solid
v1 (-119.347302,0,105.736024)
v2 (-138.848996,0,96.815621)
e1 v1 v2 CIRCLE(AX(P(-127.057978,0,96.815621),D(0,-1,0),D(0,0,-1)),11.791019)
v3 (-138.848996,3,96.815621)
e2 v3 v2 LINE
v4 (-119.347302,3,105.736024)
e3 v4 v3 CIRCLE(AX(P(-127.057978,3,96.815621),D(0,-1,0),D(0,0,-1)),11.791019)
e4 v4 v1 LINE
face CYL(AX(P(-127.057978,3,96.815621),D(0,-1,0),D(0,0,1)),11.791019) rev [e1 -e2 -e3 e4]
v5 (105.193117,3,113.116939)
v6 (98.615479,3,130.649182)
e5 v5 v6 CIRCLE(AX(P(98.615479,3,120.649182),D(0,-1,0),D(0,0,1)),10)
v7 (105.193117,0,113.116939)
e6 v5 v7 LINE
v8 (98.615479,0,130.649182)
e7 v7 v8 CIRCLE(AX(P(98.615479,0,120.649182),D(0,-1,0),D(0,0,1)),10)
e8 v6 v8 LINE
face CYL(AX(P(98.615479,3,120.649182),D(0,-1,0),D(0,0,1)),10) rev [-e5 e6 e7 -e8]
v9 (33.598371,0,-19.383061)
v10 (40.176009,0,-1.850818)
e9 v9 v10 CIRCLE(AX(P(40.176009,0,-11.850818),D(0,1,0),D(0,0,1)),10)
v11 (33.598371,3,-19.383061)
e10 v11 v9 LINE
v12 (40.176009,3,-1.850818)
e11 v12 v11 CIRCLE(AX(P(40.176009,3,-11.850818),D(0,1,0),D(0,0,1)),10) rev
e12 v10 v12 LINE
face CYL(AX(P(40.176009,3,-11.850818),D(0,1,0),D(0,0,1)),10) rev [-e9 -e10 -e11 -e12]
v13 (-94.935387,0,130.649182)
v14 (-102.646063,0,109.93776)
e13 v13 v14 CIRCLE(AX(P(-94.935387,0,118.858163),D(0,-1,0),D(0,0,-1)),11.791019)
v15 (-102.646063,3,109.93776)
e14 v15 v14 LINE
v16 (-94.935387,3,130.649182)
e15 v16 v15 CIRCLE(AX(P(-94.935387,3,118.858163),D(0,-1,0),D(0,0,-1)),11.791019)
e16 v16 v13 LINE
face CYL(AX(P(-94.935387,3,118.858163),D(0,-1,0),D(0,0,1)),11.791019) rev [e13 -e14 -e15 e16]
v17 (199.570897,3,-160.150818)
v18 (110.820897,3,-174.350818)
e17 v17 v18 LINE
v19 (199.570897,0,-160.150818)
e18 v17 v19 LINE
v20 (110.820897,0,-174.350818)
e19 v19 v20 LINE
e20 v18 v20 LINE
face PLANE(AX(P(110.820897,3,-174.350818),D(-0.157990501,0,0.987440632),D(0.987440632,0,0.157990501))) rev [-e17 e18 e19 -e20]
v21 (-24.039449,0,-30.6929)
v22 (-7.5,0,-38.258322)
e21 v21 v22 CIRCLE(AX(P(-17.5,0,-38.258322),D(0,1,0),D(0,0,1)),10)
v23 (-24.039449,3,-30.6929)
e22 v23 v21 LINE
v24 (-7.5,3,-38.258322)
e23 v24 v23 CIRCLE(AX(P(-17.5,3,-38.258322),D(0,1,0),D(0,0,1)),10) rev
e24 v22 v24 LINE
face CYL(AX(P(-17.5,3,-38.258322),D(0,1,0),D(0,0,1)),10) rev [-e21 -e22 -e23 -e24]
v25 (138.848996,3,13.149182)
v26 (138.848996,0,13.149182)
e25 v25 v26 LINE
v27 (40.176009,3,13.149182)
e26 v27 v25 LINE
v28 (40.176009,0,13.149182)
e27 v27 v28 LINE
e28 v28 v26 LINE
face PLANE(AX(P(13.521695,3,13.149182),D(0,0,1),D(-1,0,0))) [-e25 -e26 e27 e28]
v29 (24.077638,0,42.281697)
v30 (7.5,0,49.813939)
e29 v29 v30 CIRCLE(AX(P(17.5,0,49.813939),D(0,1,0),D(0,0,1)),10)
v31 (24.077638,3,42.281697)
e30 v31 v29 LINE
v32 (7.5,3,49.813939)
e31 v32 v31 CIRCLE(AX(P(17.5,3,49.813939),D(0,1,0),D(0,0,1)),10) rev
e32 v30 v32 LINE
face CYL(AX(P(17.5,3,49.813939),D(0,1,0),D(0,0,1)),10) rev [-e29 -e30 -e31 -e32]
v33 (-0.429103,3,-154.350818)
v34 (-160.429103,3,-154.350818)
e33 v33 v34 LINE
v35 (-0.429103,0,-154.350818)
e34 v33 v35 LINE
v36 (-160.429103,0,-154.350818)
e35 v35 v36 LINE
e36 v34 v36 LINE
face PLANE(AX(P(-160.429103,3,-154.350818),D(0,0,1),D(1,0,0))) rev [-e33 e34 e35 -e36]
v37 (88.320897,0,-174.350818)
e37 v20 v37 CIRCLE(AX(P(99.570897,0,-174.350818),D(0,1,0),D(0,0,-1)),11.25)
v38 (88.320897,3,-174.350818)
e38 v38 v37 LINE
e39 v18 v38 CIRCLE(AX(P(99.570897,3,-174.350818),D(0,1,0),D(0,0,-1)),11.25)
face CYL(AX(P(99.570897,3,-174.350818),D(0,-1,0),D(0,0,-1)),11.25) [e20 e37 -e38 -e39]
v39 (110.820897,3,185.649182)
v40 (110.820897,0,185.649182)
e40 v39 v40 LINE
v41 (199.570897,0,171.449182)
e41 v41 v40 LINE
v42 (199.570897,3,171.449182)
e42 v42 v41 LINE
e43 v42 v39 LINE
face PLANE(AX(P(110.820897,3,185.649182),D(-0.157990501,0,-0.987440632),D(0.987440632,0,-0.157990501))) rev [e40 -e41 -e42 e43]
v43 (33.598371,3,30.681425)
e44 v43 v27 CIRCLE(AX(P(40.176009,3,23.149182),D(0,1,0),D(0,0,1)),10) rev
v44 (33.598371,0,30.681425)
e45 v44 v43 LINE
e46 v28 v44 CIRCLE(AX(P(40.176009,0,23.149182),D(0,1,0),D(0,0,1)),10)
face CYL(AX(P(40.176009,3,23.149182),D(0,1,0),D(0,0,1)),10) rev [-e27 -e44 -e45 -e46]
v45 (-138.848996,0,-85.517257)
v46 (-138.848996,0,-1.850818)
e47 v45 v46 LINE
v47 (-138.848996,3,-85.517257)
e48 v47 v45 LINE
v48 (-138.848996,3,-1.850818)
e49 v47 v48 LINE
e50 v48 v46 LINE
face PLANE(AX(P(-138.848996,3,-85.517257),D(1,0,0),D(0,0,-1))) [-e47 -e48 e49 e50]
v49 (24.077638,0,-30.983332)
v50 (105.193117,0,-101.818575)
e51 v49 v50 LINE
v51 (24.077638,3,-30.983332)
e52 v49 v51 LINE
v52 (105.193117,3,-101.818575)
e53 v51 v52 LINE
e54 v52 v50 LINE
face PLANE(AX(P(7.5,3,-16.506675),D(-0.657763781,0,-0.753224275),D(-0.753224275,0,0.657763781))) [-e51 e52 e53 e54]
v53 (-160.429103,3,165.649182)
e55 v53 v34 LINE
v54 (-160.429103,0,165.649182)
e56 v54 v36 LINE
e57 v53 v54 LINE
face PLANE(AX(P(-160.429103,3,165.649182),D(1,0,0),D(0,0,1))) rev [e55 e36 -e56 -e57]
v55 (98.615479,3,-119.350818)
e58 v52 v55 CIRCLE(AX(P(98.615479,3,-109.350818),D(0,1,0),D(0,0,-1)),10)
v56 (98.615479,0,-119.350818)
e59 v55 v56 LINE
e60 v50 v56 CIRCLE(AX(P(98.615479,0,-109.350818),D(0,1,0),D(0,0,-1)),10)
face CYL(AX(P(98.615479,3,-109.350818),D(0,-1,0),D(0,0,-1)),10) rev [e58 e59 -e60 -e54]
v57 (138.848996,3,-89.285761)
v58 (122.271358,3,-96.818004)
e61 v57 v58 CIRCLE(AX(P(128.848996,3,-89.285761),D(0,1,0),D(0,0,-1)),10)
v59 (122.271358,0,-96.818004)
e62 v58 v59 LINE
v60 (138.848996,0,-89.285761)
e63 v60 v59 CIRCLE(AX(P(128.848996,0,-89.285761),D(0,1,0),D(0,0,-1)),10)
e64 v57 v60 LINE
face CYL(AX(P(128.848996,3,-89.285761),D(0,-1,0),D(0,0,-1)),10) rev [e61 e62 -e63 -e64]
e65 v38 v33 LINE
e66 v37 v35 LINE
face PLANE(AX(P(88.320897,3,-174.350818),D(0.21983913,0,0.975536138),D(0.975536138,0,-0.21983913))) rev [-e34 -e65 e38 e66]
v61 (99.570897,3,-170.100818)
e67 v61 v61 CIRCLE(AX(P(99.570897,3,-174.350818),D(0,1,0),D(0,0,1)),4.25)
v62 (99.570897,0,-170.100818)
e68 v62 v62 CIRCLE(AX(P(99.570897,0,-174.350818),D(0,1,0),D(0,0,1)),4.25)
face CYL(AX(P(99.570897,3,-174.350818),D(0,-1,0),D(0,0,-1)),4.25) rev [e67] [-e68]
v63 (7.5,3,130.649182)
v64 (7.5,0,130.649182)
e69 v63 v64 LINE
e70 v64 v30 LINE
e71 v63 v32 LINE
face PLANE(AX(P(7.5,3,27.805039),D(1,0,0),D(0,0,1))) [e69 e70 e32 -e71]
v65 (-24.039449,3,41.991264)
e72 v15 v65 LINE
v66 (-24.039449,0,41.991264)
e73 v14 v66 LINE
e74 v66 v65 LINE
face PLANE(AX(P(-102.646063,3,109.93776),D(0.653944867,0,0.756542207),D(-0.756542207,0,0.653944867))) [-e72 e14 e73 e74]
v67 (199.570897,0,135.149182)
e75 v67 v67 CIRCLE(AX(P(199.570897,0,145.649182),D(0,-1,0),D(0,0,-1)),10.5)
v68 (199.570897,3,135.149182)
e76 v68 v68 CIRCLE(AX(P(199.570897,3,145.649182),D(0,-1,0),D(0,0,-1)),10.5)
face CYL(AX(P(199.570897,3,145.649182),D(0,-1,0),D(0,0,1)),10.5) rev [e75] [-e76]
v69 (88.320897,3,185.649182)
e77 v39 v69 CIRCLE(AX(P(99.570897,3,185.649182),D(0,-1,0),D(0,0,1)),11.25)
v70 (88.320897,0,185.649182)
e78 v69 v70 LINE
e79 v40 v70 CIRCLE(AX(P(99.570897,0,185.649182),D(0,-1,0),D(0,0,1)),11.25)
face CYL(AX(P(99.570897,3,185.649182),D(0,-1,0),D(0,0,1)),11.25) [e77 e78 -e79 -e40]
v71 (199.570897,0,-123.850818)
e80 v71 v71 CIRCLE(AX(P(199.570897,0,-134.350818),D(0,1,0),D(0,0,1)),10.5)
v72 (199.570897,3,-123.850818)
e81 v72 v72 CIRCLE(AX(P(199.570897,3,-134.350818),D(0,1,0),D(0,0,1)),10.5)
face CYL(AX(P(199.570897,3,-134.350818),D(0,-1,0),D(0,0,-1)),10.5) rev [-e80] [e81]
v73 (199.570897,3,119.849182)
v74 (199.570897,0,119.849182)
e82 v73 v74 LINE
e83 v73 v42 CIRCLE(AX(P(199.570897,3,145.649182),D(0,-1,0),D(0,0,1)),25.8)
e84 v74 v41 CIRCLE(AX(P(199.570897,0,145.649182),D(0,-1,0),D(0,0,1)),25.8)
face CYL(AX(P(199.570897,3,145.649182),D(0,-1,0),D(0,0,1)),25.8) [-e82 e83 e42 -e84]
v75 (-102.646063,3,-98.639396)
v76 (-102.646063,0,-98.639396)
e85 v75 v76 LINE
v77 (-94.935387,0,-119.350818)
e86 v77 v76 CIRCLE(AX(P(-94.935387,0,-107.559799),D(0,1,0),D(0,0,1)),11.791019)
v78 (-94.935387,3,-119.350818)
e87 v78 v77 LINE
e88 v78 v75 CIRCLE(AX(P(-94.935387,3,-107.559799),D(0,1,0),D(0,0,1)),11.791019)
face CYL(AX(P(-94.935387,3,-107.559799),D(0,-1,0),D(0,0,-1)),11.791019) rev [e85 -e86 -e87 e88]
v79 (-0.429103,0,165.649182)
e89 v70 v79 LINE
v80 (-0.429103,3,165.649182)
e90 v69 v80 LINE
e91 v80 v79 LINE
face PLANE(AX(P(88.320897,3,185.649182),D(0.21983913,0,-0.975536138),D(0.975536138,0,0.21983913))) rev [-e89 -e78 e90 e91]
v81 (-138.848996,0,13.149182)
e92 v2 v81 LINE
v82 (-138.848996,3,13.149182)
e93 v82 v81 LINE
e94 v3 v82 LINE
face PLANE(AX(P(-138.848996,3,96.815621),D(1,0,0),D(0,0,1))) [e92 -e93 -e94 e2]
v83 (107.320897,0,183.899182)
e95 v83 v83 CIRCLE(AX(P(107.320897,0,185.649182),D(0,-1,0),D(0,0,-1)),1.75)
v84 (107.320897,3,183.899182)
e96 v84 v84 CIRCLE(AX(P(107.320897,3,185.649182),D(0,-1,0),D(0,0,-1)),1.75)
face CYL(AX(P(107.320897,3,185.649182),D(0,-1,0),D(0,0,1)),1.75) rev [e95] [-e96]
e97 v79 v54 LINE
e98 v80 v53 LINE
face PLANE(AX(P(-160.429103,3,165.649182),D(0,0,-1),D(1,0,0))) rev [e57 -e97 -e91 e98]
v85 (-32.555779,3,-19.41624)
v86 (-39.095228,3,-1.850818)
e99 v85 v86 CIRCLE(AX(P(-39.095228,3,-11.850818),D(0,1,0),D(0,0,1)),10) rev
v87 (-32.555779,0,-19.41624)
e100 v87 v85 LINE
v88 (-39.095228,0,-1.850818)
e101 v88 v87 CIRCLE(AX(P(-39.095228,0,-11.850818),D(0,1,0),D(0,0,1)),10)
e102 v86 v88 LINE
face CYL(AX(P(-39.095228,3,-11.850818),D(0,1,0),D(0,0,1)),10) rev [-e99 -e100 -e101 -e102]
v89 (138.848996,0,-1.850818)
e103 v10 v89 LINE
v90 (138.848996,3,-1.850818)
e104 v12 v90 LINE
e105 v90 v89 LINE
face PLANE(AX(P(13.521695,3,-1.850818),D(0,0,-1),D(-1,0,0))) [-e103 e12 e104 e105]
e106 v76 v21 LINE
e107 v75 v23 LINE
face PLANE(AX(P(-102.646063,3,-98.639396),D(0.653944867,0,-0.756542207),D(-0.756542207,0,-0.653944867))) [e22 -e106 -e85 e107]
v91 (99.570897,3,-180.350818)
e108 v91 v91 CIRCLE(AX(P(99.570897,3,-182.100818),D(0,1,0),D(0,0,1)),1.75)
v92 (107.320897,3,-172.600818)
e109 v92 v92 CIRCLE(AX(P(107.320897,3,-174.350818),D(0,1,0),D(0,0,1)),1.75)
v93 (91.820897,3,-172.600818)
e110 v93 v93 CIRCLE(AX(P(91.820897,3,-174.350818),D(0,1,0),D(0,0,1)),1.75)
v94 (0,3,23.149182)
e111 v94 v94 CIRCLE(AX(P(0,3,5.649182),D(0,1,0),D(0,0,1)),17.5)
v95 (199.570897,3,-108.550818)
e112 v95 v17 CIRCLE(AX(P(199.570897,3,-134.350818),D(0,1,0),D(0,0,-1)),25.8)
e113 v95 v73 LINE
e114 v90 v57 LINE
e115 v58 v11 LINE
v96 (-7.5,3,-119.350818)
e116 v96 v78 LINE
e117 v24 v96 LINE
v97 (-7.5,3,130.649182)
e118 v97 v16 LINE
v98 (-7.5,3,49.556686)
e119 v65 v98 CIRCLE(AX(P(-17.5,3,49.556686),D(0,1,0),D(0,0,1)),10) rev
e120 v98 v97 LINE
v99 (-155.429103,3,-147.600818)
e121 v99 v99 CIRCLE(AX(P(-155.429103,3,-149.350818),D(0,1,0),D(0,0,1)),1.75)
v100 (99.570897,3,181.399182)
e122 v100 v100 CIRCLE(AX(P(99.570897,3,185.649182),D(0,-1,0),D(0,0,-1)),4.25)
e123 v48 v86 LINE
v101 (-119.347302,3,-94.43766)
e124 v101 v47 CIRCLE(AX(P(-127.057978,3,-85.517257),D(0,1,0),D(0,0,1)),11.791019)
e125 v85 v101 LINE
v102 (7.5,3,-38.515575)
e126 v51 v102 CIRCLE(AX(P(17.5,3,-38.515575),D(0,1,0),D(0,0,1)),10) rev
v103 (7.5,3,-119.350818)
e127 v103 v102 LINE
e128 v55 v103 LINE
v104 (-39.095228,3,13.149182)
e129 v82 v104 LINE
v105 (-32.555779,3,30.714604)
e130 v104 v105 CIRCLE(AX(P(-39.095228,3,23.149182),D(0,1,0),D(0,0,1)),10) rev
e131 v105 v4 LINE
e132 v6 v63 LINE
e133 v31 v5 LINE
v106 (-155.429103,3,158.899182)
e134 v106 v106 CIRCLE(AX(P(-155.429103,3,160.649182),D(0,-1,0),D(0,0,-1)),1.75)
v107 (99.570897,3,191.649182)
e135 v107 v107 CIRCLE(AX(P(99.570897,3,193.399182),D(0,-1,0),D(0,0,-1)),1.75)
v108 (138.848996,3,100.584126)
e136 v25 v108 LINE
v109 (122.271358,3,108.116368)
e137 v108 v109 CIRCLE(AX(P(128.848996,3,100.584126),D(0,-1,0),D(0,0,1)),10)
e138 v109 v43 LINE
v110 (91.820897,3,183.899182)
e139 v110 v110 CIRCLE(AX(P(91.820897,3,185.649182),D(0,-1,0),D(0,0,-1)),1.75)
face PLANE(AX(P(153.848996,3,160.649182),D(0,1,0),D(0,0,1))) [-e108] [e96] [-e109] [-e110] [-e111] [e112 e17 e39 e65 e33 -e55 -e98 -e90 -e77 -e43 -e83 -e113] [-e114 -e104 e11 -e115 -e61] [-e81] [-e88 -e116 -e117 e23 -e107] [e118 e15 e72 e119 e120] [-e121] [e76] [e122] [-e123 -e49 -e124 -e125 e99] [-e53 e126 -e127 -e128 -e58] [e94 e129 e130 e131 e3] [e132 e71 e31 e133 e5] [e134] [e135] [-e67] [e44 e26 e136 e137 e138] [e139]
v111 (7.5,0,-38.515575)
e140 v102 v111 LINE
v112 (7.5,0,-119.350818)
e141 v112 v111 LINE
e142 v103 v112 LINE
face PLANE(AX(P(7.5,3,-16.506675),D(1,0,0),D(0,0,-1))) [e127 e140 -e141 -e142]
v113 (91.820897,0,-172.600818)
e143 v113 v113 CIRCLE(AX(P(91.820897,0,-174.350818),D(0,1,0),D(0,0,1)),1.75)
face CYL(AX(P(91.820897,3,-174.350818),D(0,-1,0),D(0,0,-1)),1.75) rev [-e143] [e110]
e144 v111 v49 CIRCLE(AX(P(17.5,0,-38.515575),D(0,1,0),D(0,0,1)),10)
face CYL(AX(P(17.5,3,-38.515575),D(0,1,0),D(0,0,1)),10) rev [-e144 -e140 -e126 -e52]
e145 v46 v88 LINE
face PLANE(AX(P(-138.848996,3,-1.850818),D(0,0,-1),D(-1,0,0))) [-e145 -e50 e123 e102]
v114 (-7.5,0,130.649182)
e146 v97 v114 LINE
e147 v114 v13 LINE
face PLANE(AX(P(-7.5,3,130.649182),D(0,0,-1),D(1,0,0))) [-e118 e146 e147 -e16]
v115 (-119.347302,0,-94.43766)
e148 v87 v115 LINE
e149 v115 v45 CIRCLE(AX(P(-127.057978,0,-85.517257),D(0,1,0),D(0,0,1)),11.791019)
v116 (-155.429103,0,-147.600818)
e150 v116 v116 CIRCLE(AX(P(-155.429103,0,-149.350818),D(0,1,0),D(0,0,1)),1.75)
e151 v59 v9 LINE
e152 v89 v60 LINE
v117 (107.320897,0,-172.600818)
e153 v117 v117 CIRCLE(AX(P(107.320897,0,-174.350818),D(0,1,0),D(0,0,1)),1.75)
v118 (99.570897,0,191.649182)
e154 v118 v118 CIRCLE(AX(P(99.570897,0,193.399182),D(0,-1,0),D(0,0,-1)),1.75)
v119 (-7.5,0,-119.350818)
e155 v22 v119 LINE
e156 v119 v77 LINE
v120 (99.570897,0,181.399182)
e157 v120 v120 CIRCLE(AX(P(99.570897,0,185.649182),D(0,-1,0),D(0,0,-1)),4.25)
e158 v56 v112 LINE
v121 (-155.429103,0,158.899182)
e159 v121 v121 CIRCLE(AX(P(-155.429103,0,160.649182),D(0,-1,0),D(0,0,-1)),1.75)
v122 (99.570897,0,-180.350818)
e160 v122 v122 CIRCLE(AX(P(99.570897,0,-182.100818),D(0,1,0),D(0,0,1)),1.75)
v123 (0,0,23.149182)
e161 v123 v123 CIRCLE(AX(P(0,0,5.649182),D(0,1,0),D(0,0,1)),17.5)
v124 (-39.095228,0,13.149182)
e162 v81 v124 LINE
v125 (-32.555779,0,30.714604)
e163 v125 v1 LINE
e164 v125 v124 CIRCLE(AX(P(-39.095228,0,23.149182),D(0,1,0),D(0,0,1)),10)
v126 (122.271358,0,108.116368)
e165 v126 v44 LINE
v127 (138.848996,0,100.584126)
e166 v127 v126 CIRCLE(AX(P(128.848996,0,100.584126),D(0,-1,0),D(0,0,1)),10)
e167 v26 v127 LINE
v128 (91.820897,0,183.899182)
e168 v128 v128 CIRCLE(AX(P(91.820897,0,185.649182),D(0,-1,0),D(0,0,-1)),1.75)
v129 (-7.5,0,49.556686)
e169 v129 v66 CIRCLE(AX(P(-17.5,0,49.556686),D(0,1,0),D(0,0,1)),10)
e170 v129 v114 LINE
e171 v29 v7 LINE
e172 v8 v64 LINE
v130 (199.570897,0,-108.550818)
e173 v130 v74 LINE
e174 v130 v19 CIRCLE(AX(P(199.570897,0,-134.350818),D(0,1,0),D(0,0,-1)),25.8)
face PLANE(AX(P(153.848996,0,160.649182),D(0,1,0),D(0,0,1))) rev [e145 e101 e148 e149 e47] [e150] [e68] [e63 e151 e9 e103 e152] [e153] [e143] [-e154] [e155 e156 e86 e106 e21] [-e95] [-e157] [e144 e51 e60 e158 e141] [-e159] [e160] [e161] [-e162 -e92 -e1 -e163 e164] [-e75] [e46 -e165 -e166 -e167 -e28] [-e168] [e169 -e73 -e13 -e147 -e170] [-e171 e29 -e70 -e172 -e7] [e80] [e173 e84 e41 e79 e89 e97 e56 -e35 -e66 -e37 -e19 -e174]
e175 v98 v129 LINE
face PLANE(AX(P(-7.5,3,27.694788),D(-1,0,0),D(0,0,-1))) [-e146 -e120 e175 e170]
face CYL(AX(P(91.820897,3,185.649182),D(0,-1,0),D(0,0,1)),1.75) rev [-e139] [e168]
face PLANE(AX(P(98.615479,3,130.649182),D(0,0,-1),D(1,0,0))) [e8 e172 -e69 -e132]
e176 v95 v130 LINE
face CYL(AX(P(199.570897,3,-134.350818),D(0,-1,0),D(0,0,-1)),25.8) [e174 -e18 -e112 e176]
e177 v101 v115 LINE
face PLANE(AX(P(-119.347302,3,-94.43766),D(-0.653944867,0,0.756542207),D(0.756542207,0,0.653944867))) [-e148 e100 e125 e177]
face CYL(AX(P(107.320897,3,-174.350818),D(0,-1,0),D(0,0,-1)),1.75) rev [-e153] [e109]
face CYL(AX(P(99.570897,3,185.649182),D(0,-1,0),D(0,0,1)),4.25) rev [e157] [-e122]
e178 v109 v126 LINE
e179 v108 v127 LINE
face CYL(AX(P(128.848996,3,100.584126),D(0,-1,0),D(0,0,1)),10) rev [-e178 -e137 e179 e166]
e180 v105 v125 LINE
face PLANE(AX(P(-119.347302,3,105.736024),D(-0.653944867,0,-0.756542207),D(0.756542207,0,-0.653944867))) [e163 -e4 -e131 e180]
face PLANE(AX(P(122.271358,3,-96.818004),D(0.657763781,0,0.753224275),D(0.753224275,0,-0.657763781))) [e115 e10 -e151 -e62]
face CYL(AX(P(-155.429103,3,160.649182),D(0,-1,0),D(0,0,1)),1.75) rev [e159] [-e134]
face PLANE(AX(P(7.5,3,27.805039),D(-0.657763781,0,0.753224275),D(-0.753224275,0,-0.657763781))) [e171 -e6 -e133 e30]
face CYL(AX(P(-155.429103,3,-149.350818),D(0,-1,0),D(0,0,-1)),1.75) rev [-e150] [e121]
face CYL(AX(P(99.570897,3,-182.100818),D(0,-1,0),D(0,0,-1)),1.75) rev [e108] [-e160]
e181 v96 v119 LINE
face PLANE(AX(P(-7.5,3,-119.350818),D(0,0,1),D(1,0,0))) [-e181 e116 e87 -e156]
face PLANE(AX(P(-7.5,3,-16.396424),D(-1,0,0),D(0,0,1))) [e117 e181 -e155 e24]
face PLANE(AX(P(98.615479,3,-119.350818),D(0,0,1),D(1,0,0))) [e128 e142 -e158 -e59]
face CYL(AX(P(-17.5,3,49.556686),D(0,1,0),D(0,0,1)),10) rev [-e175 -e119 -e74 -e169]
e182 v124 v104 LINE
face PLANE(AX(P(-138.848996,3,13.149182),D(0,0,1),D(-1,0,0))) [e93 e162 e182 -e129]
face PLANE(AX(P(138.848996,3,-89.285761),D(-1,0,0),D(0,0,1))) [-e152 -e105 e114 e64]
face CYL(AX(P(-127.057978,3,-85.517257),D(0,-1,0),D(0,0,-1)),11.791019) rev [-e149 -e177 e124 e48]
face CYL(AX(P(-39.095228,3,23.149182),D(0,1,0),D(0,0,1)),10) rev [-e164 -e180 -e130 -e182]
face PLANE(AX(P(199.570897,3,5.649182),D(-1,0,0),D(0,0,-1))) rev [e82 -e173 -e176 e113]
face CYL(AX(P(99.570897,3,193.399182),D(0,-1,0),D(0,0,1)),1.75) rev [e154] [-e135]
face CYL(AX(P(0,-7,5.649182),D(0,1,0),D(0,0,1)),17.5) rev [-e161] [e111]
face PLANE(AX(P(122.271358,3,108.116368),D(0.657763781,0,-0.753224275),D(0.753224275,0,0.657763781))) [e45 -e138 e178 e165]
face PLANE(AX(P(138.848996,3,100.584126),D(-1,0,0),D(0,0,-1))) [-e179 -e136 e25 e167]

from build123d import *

# Parameters (mm, degrees)
SKETCH1_R             = 1.75
BOSS_EXTRUDE2_DEPTH   = 3
SKETCH1_R_2           = 4.25
SKETCH1_R_3           = 10.5
BOSS_EXTRUDE2_2_DEPTH = 3
FILLET1_R             = 10
SKETCH2_R             = 17.5
CUT_EXTRUDE1_DEPTH    = 10


with BuildPart() as part:
    # Sketch1 → Boss-Extrude2 (new body)
    with BuildSketch(Plane(origin=(0, 0, 0), x_dir=(1, 0, 0), z_dir=(0, 1, 0))):
        with Locations((153.848996294, -160.649182064)):
            Circle(SKETCH1_R)
    boss_extrude2 = extrude(amount=BOSS_EXTRUDE2_DEPTH)


with BuildPart() as body_2:
    # Sketch1 → Boss-Extrude2 2 (new body)
    with BuildSketch(Plane(origin=(0, 0, 0), x_dir=(1, 0, 0), z_dir=(0, 1, 0))):
        with BuildLine():
            Line((-160.429103157, 154.350817936), (-0.429103157, 154.350817936))
            Line((-0.429103157, 154.350817936), (88.320896843, 174.350817936))
            ThreePointArc((88.320896843, 174.350817936), (99.570896843, 185.600817936), (110.820896843, 174.350817936))
            Line((110.820896843, 174.350817936), (199.570896843, 160.150817936))
            ThreePointArc((199.570896843, 160.150817936), (225.370896843, 134.350817936), (199.570896843, 108.550817936))
            Line((199.570896843, 108.550817936), (199.570896843, -5.649182064))
            Line((199.570896843, -5.649182064), (140.384809243, -5.649182064))
            Line((140.384809243, -5.649182064), (17.871310963, -5.649182064))
            Line((17.871310963, -5.649182064), (-17.871310963, -5.649182064))
            Line((-17.871310963, -5.649182064), (-140.384809243, -5.649182064))
            Line((-140.384809243, -5.649182064), (-160.429103157, -5.649182064))
            Line((-160.429103157, -5.649182064), (-160.429103157, 154.350817936))
        make_face()
        with Locations((99.570896843, 174.350817936)):
            Circle(SKETCH1_R_2, mode=Mode.SUBTRACT)
        with Locations((199.570896843, 134.350817936)):
            Circle(SKETCH1_R_3, mode=Mode.SUBTRACT)
        with Locations((-155.429103157, 149.350817936)):
            Circle(SKETCH1_R, mode=Mode.SUBTRACT)
        with Locations((153.848996294, 149.350817936)):
            Circle(SKETCH1_R, mode=Mode.SUBTRACT)
        with Locations((107.320896843, 174.350817936)):
            Circle(SKETCH1_R, mode=Mode.SUBTRACT)
        with Locations((91.820896843, 174.350817936)):
            Circle(SKETCH1_R, mode=Mode.SUBTRACT)
        with Locations((99.570896843, 182.100817936)):
            Circle(SKETCH1_R, mode=Mode.SUBTRACT)
        with BuildLine():
            Line((98.615479423, 119.350817936), (7.5, 119.350817936))
            Line((7.5, 119.350817936), (7.5, 16.506675056))
            Line((7.5, 16.506675056), (105.19311723, 101.818575184))
            ThreePointArc((105.19311723, 101.818575184), (107.978236162, 112.863478785), (98.615479423, 119.350817936))
        make_face(mode=Mode.SUBTRACT)
        with BuildLine():
            Line((-102.646063409, 98.639396028), (-7.5, 16.39642362))
            Line((-7.5, 16.39642362), (-7.5, 119.350817936))
            Line((-7.5, 119.350817936), (-94.935387285, 119.350817936))
            ThreePointArc((-94.935387285, 119.350817936), (-105.985472395, 111.673646608), (-102.646063409, 98.639396028))
        make_face(mode=Mode.SUBTRACT)
        with BuildLine():
            Line((122.271358487, 96.81800419), (13.521694655, 1.850817936))
            Line((13.521694655, 1.850817936), (138.848996294, 1.850817936))
            Line((138.848996294, 1.850817936), (138.848996294, 89.285761438))
            ThreePointArc((138.848996294, 89.285761438), (132.985638769, 98.390056525), (122.271358487, 96.81800419))
        make_face(mode=Mode.SUBTRACT)
        with BuildLine():
            Line((-119.347301526, 94.437659895), (-12.234519996, 1.850817936))
            Line((-12.234519996, 1.850817936), (-138.848996294, 1.850817936))
            Line((-138.848996294, 1.850817936), (-138.848996294, 85.517256632))
            ThreePointArc((-138.848996294, 85.517256632), (-131.96263843, 96.23977608), (-119.347301526, 94.437659895))
        make_face(mode=Mode.SUBTRACT)
    boss_extrude2_2 = extrude(amount=BOSS_EXTRUDE2_2_DEPTH)


with BuildPart() as part_1:
    add(part.part)

    add(body_2.part)  # Mirror1 merges body 2
    # Mirror1: Boss-Extrude2, Boss-Extrude2 2 across plane
    add(boss_extrude2.mirror(Plane(origin=(199.570896843, 3, 5.649182064), x_dir=(1, 0, 0), z_dir=(0, 0, -1))))
    add(boss_extrude2_2.mirror(Plane(origin=(199.570896843, 3, 5.649182064), x_dir=(1, 0, 0), z_dir=(0, 0, -1))))

    # Fillet1
    fillet1_edges = [part_1.edges().sort_by_distance(p)[0] for p in [
        (-12.234519996, 1.5, 13.149182064),
        (-12.234519996, 1.5, -1.850817936),
        (-7.5, 1.5, -16.39642362),
        (7.5, 1.5, -16.506675056),
        (13.521694655, 1.5, -1.850817936),
        (13.521694655, 1.5, 13.149182064),
        (7.5, 1.5, 27.805039185),
        (-7.5, 1.5, 27.694787748),
    ]]
    fillet(fillet1_edges, radius=FILLET1_R)

    # Sketch2 → Cut-Extrude1 (cut)
    with BuildSketch(Plane(origin=(0, 3, 0), x_dir=(1, 0, 0), z_dir=(0, 1, 0))):
        with Locations((0, -5.649182064)):
            Circle(SKETCH2_R)
    extrude(amount=-CUT_EXTRUDE1_DEPTH, mode=Mode.SUBTRACT)


solid = part_1.part
